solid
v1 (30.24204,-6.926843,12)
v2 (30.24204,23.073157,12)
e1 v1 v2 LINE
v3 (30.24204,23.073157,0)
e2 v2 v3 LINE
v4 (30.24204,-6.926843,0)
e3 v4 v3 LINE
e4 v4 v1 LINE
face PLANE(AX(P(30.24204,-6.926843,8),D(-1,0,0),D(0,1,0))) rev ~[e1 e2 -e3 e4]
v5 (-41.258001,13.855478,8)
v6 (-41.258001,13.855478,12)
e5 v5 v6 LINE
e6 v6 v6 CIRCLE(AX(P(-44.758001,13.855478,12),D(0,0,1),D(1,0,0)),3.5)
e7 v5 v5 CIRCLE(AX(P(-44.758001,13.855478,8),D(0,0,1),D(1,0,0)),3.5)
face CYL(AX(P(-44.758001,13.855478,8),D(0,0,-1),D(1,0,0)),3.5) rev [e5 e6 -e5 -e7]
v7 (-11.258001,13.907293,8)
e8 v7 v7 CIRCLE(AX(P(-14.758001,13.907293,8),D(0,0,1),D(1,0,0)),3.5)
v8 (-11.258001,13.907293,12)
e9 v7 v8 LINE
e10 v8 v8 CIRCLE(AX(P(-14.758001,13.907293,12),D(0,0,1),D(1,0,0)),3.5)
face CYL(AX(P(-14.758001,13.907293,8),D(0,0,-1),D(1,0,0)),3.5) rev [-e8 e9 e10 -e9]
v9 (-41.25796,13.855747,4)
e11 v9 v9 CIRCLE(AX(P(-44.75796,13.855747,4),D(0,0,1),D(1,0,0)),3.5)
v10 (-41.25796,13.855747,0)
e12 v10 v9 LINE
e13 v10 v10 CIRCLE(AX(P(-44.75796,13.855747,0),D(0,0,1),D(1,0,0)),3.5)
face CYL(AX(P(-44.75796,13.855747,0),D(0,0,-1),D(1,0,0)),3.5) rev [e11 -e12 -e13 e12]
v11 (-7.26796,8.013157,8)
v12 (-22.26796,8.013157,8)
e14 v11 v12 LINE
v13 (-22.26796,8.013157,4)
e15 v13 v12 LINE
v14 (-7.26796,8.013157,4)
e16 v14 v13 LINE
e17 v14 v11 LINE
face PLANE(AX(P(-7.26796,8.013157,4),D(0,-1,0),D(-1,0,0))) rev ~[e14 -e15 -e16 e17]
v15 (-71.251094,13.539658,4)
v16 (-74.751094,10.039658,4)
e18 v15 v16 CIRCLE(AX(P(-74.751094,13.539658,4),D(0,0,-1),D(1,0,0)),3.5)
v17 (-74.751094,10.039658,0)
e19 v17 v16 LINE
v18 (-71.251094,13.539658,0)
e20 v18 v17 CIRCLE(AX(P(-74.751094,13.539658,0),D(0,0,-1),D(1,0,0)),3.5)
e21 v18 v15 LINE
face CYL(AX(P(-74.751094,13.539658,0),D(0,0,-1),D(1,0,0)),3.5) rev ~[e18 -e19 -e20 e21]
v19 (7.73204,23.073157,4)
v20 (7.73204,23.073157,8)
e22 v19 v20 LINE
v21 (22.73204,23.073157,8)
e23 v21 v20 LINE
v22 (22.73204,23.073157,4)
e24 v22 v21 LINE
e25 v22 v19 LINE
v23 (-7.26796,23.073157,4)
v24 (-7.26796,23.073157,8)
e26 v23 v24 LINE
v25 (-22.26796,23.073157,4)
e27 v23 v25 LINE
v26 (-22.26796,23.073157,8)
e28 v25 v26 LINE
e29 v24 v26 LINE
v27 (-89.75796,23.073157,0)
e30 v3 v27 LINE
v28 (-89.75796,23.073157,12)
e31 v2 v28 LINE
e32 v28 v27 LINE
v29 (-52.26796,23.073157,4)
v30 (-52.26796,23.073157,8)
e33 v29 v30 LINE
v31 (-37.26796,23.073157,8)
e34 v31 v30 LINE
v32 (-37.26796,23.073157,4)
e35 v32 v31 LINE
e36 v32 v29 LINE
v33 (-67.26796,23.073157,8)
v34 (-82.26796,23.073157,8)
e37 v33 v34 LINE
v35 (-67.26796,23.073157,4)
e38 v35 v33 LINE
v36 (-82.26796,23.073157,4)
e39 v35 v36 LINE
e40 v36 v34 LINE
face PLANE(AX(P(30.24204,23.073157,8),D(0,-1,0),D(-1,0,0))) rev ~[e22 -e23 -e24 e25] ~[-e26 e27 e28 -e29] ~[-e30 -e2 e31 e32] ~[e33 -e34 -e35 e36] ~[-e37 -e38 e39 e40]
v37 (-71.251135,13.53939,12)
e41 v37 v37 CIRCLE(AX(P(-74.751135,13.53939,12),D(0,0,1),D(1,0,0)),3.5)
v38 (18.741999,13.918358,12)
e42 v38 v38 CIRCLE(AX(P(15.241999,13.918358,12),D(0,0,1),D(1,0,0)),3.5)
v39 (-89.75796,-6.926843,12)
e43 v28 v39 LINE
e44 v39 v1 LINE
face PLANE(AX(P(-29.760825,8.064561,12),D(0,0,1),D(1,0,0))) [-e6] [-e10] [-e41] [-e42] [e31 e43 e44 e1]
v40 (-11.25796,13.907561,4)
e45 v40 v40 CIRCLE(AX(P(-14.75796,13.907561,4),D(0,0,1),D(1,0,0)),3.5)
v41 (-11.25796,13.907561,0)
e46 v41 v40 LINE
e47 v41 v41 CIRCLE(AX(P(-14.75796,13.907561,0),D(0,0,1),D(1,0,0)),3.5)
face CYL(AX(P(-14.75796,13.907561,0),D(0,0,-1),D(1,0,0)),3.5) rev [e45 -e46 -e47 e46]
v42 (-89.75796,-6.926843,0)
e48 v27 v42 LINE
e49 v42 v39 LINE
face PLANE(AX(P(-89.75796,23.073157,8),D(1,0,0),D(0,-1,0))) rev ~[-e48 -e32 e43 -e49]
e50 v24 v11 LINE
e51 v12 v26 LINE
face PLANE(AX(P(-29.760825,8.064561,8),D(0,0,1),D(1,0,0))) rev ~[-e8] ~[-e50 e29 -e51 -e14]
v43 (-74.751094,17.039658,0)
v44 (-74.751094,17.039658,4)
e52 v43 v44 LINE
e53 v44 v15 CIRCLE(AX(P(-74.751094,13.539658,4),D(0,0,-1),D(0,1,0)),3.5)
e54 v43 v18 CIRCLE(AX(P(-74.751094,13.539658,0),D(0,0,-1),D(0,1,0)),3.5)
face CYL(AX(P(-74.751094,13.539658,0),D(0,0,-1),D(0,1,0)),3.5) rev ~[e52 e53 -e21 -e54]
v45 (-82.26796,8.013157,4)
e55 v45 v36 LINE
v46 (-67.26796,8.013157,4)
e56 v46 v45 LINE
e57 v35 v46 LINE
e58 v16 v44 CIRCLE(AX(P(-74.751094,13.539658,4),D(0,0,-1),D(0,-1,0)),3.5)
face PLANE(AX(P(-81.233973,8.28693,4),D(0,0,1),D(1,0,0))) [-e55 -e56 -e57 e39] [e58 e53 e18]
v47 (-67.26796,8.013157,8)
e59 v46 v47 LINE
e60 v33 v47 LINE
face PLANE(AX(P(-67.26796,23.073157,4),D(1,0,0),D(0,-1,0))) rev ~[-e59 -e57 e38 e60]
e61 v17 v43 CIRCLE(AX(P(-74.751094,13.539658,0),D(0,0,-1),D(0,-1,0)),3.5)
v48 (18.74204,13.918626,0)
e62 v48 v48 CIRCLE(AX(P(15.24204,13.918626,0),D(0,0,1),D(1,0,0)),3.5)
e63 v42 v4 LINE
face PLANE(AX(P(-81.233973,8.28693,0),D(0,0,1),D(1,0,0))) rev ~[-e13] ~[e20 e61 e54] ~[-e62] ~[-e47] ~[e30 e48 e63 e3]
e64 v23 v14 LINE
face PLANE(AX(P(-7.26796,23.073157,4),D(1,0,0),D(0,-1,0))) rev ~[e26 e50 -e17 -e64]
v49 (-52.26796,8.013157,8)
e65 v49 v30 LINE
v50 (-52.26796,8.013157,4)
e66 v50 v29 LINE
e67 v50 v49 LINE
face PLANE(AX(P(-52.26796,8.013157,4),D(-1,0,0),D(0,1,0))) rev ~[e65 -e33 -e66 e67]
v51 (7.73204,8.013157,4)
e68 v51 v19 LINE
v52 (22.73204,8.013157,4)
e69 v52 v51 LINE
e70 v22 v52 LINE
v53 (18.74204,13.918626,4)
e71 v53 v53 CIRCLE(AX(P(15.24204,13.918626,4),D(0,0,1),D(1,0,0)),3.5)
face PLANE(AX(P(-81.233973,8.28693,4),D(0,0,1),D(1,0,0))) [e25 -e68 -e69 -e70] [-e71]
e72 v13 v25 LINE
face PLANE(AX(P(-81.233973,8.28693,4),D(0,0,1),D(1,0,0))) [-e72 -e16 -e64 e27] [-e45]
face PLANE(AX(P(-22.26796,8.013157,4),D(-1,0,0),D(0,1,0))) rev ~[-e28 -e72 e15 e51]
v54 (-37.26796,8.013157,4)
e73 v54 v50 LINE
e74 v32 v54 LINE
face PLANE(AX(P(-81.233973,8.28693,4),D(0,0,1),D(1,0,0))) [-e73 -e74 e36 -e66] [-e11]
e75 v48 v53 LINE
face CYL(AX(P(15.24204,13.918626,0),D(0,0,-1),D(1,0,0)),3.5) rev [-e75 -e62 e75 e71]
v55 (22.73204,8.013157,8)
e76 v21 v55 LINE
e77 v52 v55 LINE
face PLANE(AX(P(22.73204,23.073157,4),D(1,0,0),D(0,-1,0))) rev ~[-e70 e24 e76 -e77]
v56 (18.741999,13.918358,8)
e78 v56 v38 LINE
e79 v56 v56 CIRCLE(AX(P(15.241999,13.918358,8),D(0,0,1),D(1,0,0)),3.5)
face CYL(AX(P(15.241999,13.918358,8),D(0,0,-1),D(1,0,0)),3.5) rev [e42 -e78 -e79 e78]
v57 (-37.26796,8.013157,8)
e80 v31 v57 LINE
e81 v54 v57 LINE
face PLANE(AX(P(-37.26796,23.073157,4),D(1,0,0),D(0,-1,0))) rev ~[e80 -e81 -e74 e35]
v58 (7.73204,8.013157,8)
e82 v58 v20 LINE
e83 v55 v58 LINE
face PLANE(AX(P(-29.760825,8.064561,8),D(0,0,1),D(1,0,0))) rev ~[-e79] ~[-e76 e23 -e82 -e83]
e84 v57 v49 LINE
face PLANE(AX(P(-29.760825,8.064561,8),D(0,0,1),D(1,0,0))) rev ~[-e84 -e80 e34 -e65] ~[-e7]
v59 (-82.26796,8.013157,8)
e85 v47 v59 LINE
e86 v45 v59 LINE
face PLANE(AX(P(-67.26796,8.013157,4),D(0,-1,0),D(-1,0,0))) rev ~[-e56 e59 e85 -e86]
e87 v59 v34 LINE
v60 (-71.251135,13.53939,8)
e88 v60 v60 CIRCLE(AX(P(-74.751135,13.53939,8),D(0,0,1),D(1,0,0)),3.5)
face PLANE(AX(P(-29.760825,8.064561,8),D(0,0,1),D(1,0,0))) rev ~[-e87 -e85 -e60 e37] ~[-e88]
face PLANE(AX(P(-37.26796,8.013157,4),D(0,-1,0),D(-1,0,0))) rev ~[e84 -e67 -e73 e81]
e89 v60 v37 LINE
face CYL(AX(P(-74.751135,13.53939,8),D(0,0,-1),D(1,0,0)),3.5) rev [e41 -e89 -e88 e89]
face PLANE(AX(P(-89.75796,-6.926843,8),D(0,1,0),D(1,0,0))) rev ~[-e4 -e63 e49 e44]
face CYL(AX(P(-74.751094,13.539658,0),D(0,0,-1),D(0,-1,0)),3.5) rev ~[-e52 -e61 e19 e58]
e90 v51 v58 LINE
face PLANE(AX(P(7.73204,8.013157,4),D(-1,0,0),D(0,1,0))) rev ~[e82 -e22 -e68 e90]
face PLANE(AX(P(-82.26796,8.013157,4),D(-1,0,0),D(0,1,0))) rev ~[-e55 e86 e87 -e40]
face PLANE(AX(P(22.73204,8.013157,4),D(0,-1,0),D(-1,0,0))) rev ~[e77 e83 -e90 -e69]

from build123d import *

# Parameters (mm, degrees)
F0_R     = 3.5
F1_DEPTH = 4
F3_DEPTH = 4
F4_W     = 15
F4_H     = 15.06
F4_R     = 3.5
F5_DEPTH = 4


# Not quite as in the source:
# - a feature names something its author has since deleted; it is built from what else it names


with BuildPart() as f1:
    # F0 (on Top) → F1 (new body)
    with BuildSketch(Plane.XY):
        with BuildLine():
            Line((-74.7510943777, 23.0731565692), (-87.7510943777, 23.0731565692))
            Line((-87.7510943777, 23.0731565692), (-87.7510943777, 19.0731565692))
            Line((-87.7510943777, 19.0731565692), (-87.7510943777, 17.0731565692))
            Line((-87.7510943777, 17.0731565692), (-87.7510943777, -6.9268434308))
            Line((-87.7510943777, -6.9268434308), (-74.7510943777, -6.9268434308))
            Line((-74.7510943777, -6.9268434308), (-74.7510943777, 10.0396581329))
            ThreePointArc((-74.7510943777, 10.0396581329), (-78.2510943777, 13.5396581329), (-74.7510943777, 17.0396581329))
            Line((-74.7510943777, 17.0396581329), (-74.7510943777, 23.0731565692))
        make_face()
        Polygon((-87.7510943777, 19.0731565692), (-87.7510943777, 23.0731565692), (-89.7579597334, 23.0731565692), (-89.7579597334, -6.9268434308), (-87.7510943777, -6.9268434308), (-87.7510943777, 17.0731565692), align=None)
        with BuildLine():
            Line((30.2420402666, 23.0731565692), (-74.7510943777, 23.0731565692))
            Line((-74.7510943777, 23.0731565692), (-74.7510943777, 17.0396581329))
            ThreePointArc((-74.7510943777, 17.0396581329), (-72.2762206436, 16.0145318671), (-71.2510943777, 13.5396581329))
            ThreePointArc((-71.2510943777, 13.5396581329), (-72.2762206436, 11.0647843988), (-74.7510943777, 10.0396581329))
            Line((-74.7510943777, 10.0396581329), (-74.7510943777, -6.9268434308))
            Line((-74.7510943777, -6.9268434308), (30.2420402666, -6.9268434308))
            Line((30.2420402666, -6.9268434308), (30.2420402666, 23.0731565692))
        make_face()
        with Locations((-44.7579597334, 13.8557466809)):
            Circle(F0_R, mode=Mode.SUBTRACT)
        with Locations((-14.7579597334, 13.9075608123)):
            Circle(F0_R, mode=Mode.SUBTRACT)
        with Locations((15.2420402666, 13.9186258558)):
            Circle(F0_R, mode=Mode.SUBTRACT)
    extrude(amount=F1_DEPTH)

    # F2 (on face) → F3 (join)
    with BuildSketch(Plane.XY.offset(4)):
        Polygon((30.2420402666, 23.0731565692), (30.2320402666, 23.0731565692), (30.2420402666, -6.9268434308), align=None)
        Polygon((30.2420402666, -6.9268434308), (30.2320402666, 23.0731565692), (22.7320402666, 23.0731565692), (22.7320402666, 8.0131565692), (7.7320402666, 8.0131565692), (7.7320402666, 23.0731565692), (-7.2679597334, 23.0731565692), (-7.2679597334, 8.0131565692), (-22.2679597334, 8.0131565692), (-22.2679597334, 23.0731565692), (-37.2679597334, 23.0731565692), (-37.2679597334, 8.0131565692), (-52.2679597334, 8.0131565692), (-52.2679597334, 23.0731565692), (-67.2679597334, 23.0731565692), (-67.2679597334, 8.0131565692), (-82.2679597334, 8.0131565692), (-82.2679597334, 23.0731565692), (-89.7579597334, 23.0731565692), (-89.7579597334, -6.9268434308), align=None)
    extrude(amount=F3_DEPTH)

    # F4 (on face) → F5 (join)
    with BuildSketch(Plane.XY.offset(8)):
        Polygon((-82.2679597334, 23.0731565692), (-89.7579597334, 23.0731565692), (-89.7579597334, -6.9268434308), (30.2420402666, -6.9268434308), (30.2420402666, 23.0731565692), (22.7320402666, 23.0731565692), (22.7320402666, 8.0131565692), (7.7320402666, 8.0131565692), (7.7320402666, 23.0731565692), (-7.2679597334, 23.0731565692), (-7.2679597334, 8.0131565692), (-22.2679597334, 8.0131565692), (-22.2679597334, 23.0731565692), (-37.2679597334, 23.0731565692), (-37.2679597334, 8.0131565692), (-52.2679597334, 8.0131565692), (-52.2679597334, 23.0731565692), (-67.2679597334, 23.0731565692), (-67.2679597334, 8.0131565692), (-82.2679597334, 8.0131565692), align=None)
        with Locations((-44.7679597334, 15.5431565692)):
            Rectangle(F4_W, F4_H)
        with Locations((-44.7580007362, 13.8554783896)):
            Circle(F4_R, mode=Mode.SUBTRACT)
        with Locations((-14.7679597334, 15.5431565692)):
            Rectangle(F4_W, F4_H)
        with Locations((-14.7580007362, 13.907292521)):
            Circle(F4_R, mode=Mode.SUBTRACT)
        with Locations((15.2320402666, 15.5431565692)):
            Rectangle(F4_W, F4_H)
        with Locations((15.2419992638, 13.9183575645)):
            Circle(F4_R, mode=Mode.SUBTRACT)
        with Locations((-74.7679597334, 15.5431565692)):
            Rectangle(F4_W, F4_H)
        with Locations((-74.7511353805, 13.5393898416)):
            Circle(F4_R, mode=Mode.SUBTRACT)
    extrude(amount=F5_DEPTH)


solid = f1.part
